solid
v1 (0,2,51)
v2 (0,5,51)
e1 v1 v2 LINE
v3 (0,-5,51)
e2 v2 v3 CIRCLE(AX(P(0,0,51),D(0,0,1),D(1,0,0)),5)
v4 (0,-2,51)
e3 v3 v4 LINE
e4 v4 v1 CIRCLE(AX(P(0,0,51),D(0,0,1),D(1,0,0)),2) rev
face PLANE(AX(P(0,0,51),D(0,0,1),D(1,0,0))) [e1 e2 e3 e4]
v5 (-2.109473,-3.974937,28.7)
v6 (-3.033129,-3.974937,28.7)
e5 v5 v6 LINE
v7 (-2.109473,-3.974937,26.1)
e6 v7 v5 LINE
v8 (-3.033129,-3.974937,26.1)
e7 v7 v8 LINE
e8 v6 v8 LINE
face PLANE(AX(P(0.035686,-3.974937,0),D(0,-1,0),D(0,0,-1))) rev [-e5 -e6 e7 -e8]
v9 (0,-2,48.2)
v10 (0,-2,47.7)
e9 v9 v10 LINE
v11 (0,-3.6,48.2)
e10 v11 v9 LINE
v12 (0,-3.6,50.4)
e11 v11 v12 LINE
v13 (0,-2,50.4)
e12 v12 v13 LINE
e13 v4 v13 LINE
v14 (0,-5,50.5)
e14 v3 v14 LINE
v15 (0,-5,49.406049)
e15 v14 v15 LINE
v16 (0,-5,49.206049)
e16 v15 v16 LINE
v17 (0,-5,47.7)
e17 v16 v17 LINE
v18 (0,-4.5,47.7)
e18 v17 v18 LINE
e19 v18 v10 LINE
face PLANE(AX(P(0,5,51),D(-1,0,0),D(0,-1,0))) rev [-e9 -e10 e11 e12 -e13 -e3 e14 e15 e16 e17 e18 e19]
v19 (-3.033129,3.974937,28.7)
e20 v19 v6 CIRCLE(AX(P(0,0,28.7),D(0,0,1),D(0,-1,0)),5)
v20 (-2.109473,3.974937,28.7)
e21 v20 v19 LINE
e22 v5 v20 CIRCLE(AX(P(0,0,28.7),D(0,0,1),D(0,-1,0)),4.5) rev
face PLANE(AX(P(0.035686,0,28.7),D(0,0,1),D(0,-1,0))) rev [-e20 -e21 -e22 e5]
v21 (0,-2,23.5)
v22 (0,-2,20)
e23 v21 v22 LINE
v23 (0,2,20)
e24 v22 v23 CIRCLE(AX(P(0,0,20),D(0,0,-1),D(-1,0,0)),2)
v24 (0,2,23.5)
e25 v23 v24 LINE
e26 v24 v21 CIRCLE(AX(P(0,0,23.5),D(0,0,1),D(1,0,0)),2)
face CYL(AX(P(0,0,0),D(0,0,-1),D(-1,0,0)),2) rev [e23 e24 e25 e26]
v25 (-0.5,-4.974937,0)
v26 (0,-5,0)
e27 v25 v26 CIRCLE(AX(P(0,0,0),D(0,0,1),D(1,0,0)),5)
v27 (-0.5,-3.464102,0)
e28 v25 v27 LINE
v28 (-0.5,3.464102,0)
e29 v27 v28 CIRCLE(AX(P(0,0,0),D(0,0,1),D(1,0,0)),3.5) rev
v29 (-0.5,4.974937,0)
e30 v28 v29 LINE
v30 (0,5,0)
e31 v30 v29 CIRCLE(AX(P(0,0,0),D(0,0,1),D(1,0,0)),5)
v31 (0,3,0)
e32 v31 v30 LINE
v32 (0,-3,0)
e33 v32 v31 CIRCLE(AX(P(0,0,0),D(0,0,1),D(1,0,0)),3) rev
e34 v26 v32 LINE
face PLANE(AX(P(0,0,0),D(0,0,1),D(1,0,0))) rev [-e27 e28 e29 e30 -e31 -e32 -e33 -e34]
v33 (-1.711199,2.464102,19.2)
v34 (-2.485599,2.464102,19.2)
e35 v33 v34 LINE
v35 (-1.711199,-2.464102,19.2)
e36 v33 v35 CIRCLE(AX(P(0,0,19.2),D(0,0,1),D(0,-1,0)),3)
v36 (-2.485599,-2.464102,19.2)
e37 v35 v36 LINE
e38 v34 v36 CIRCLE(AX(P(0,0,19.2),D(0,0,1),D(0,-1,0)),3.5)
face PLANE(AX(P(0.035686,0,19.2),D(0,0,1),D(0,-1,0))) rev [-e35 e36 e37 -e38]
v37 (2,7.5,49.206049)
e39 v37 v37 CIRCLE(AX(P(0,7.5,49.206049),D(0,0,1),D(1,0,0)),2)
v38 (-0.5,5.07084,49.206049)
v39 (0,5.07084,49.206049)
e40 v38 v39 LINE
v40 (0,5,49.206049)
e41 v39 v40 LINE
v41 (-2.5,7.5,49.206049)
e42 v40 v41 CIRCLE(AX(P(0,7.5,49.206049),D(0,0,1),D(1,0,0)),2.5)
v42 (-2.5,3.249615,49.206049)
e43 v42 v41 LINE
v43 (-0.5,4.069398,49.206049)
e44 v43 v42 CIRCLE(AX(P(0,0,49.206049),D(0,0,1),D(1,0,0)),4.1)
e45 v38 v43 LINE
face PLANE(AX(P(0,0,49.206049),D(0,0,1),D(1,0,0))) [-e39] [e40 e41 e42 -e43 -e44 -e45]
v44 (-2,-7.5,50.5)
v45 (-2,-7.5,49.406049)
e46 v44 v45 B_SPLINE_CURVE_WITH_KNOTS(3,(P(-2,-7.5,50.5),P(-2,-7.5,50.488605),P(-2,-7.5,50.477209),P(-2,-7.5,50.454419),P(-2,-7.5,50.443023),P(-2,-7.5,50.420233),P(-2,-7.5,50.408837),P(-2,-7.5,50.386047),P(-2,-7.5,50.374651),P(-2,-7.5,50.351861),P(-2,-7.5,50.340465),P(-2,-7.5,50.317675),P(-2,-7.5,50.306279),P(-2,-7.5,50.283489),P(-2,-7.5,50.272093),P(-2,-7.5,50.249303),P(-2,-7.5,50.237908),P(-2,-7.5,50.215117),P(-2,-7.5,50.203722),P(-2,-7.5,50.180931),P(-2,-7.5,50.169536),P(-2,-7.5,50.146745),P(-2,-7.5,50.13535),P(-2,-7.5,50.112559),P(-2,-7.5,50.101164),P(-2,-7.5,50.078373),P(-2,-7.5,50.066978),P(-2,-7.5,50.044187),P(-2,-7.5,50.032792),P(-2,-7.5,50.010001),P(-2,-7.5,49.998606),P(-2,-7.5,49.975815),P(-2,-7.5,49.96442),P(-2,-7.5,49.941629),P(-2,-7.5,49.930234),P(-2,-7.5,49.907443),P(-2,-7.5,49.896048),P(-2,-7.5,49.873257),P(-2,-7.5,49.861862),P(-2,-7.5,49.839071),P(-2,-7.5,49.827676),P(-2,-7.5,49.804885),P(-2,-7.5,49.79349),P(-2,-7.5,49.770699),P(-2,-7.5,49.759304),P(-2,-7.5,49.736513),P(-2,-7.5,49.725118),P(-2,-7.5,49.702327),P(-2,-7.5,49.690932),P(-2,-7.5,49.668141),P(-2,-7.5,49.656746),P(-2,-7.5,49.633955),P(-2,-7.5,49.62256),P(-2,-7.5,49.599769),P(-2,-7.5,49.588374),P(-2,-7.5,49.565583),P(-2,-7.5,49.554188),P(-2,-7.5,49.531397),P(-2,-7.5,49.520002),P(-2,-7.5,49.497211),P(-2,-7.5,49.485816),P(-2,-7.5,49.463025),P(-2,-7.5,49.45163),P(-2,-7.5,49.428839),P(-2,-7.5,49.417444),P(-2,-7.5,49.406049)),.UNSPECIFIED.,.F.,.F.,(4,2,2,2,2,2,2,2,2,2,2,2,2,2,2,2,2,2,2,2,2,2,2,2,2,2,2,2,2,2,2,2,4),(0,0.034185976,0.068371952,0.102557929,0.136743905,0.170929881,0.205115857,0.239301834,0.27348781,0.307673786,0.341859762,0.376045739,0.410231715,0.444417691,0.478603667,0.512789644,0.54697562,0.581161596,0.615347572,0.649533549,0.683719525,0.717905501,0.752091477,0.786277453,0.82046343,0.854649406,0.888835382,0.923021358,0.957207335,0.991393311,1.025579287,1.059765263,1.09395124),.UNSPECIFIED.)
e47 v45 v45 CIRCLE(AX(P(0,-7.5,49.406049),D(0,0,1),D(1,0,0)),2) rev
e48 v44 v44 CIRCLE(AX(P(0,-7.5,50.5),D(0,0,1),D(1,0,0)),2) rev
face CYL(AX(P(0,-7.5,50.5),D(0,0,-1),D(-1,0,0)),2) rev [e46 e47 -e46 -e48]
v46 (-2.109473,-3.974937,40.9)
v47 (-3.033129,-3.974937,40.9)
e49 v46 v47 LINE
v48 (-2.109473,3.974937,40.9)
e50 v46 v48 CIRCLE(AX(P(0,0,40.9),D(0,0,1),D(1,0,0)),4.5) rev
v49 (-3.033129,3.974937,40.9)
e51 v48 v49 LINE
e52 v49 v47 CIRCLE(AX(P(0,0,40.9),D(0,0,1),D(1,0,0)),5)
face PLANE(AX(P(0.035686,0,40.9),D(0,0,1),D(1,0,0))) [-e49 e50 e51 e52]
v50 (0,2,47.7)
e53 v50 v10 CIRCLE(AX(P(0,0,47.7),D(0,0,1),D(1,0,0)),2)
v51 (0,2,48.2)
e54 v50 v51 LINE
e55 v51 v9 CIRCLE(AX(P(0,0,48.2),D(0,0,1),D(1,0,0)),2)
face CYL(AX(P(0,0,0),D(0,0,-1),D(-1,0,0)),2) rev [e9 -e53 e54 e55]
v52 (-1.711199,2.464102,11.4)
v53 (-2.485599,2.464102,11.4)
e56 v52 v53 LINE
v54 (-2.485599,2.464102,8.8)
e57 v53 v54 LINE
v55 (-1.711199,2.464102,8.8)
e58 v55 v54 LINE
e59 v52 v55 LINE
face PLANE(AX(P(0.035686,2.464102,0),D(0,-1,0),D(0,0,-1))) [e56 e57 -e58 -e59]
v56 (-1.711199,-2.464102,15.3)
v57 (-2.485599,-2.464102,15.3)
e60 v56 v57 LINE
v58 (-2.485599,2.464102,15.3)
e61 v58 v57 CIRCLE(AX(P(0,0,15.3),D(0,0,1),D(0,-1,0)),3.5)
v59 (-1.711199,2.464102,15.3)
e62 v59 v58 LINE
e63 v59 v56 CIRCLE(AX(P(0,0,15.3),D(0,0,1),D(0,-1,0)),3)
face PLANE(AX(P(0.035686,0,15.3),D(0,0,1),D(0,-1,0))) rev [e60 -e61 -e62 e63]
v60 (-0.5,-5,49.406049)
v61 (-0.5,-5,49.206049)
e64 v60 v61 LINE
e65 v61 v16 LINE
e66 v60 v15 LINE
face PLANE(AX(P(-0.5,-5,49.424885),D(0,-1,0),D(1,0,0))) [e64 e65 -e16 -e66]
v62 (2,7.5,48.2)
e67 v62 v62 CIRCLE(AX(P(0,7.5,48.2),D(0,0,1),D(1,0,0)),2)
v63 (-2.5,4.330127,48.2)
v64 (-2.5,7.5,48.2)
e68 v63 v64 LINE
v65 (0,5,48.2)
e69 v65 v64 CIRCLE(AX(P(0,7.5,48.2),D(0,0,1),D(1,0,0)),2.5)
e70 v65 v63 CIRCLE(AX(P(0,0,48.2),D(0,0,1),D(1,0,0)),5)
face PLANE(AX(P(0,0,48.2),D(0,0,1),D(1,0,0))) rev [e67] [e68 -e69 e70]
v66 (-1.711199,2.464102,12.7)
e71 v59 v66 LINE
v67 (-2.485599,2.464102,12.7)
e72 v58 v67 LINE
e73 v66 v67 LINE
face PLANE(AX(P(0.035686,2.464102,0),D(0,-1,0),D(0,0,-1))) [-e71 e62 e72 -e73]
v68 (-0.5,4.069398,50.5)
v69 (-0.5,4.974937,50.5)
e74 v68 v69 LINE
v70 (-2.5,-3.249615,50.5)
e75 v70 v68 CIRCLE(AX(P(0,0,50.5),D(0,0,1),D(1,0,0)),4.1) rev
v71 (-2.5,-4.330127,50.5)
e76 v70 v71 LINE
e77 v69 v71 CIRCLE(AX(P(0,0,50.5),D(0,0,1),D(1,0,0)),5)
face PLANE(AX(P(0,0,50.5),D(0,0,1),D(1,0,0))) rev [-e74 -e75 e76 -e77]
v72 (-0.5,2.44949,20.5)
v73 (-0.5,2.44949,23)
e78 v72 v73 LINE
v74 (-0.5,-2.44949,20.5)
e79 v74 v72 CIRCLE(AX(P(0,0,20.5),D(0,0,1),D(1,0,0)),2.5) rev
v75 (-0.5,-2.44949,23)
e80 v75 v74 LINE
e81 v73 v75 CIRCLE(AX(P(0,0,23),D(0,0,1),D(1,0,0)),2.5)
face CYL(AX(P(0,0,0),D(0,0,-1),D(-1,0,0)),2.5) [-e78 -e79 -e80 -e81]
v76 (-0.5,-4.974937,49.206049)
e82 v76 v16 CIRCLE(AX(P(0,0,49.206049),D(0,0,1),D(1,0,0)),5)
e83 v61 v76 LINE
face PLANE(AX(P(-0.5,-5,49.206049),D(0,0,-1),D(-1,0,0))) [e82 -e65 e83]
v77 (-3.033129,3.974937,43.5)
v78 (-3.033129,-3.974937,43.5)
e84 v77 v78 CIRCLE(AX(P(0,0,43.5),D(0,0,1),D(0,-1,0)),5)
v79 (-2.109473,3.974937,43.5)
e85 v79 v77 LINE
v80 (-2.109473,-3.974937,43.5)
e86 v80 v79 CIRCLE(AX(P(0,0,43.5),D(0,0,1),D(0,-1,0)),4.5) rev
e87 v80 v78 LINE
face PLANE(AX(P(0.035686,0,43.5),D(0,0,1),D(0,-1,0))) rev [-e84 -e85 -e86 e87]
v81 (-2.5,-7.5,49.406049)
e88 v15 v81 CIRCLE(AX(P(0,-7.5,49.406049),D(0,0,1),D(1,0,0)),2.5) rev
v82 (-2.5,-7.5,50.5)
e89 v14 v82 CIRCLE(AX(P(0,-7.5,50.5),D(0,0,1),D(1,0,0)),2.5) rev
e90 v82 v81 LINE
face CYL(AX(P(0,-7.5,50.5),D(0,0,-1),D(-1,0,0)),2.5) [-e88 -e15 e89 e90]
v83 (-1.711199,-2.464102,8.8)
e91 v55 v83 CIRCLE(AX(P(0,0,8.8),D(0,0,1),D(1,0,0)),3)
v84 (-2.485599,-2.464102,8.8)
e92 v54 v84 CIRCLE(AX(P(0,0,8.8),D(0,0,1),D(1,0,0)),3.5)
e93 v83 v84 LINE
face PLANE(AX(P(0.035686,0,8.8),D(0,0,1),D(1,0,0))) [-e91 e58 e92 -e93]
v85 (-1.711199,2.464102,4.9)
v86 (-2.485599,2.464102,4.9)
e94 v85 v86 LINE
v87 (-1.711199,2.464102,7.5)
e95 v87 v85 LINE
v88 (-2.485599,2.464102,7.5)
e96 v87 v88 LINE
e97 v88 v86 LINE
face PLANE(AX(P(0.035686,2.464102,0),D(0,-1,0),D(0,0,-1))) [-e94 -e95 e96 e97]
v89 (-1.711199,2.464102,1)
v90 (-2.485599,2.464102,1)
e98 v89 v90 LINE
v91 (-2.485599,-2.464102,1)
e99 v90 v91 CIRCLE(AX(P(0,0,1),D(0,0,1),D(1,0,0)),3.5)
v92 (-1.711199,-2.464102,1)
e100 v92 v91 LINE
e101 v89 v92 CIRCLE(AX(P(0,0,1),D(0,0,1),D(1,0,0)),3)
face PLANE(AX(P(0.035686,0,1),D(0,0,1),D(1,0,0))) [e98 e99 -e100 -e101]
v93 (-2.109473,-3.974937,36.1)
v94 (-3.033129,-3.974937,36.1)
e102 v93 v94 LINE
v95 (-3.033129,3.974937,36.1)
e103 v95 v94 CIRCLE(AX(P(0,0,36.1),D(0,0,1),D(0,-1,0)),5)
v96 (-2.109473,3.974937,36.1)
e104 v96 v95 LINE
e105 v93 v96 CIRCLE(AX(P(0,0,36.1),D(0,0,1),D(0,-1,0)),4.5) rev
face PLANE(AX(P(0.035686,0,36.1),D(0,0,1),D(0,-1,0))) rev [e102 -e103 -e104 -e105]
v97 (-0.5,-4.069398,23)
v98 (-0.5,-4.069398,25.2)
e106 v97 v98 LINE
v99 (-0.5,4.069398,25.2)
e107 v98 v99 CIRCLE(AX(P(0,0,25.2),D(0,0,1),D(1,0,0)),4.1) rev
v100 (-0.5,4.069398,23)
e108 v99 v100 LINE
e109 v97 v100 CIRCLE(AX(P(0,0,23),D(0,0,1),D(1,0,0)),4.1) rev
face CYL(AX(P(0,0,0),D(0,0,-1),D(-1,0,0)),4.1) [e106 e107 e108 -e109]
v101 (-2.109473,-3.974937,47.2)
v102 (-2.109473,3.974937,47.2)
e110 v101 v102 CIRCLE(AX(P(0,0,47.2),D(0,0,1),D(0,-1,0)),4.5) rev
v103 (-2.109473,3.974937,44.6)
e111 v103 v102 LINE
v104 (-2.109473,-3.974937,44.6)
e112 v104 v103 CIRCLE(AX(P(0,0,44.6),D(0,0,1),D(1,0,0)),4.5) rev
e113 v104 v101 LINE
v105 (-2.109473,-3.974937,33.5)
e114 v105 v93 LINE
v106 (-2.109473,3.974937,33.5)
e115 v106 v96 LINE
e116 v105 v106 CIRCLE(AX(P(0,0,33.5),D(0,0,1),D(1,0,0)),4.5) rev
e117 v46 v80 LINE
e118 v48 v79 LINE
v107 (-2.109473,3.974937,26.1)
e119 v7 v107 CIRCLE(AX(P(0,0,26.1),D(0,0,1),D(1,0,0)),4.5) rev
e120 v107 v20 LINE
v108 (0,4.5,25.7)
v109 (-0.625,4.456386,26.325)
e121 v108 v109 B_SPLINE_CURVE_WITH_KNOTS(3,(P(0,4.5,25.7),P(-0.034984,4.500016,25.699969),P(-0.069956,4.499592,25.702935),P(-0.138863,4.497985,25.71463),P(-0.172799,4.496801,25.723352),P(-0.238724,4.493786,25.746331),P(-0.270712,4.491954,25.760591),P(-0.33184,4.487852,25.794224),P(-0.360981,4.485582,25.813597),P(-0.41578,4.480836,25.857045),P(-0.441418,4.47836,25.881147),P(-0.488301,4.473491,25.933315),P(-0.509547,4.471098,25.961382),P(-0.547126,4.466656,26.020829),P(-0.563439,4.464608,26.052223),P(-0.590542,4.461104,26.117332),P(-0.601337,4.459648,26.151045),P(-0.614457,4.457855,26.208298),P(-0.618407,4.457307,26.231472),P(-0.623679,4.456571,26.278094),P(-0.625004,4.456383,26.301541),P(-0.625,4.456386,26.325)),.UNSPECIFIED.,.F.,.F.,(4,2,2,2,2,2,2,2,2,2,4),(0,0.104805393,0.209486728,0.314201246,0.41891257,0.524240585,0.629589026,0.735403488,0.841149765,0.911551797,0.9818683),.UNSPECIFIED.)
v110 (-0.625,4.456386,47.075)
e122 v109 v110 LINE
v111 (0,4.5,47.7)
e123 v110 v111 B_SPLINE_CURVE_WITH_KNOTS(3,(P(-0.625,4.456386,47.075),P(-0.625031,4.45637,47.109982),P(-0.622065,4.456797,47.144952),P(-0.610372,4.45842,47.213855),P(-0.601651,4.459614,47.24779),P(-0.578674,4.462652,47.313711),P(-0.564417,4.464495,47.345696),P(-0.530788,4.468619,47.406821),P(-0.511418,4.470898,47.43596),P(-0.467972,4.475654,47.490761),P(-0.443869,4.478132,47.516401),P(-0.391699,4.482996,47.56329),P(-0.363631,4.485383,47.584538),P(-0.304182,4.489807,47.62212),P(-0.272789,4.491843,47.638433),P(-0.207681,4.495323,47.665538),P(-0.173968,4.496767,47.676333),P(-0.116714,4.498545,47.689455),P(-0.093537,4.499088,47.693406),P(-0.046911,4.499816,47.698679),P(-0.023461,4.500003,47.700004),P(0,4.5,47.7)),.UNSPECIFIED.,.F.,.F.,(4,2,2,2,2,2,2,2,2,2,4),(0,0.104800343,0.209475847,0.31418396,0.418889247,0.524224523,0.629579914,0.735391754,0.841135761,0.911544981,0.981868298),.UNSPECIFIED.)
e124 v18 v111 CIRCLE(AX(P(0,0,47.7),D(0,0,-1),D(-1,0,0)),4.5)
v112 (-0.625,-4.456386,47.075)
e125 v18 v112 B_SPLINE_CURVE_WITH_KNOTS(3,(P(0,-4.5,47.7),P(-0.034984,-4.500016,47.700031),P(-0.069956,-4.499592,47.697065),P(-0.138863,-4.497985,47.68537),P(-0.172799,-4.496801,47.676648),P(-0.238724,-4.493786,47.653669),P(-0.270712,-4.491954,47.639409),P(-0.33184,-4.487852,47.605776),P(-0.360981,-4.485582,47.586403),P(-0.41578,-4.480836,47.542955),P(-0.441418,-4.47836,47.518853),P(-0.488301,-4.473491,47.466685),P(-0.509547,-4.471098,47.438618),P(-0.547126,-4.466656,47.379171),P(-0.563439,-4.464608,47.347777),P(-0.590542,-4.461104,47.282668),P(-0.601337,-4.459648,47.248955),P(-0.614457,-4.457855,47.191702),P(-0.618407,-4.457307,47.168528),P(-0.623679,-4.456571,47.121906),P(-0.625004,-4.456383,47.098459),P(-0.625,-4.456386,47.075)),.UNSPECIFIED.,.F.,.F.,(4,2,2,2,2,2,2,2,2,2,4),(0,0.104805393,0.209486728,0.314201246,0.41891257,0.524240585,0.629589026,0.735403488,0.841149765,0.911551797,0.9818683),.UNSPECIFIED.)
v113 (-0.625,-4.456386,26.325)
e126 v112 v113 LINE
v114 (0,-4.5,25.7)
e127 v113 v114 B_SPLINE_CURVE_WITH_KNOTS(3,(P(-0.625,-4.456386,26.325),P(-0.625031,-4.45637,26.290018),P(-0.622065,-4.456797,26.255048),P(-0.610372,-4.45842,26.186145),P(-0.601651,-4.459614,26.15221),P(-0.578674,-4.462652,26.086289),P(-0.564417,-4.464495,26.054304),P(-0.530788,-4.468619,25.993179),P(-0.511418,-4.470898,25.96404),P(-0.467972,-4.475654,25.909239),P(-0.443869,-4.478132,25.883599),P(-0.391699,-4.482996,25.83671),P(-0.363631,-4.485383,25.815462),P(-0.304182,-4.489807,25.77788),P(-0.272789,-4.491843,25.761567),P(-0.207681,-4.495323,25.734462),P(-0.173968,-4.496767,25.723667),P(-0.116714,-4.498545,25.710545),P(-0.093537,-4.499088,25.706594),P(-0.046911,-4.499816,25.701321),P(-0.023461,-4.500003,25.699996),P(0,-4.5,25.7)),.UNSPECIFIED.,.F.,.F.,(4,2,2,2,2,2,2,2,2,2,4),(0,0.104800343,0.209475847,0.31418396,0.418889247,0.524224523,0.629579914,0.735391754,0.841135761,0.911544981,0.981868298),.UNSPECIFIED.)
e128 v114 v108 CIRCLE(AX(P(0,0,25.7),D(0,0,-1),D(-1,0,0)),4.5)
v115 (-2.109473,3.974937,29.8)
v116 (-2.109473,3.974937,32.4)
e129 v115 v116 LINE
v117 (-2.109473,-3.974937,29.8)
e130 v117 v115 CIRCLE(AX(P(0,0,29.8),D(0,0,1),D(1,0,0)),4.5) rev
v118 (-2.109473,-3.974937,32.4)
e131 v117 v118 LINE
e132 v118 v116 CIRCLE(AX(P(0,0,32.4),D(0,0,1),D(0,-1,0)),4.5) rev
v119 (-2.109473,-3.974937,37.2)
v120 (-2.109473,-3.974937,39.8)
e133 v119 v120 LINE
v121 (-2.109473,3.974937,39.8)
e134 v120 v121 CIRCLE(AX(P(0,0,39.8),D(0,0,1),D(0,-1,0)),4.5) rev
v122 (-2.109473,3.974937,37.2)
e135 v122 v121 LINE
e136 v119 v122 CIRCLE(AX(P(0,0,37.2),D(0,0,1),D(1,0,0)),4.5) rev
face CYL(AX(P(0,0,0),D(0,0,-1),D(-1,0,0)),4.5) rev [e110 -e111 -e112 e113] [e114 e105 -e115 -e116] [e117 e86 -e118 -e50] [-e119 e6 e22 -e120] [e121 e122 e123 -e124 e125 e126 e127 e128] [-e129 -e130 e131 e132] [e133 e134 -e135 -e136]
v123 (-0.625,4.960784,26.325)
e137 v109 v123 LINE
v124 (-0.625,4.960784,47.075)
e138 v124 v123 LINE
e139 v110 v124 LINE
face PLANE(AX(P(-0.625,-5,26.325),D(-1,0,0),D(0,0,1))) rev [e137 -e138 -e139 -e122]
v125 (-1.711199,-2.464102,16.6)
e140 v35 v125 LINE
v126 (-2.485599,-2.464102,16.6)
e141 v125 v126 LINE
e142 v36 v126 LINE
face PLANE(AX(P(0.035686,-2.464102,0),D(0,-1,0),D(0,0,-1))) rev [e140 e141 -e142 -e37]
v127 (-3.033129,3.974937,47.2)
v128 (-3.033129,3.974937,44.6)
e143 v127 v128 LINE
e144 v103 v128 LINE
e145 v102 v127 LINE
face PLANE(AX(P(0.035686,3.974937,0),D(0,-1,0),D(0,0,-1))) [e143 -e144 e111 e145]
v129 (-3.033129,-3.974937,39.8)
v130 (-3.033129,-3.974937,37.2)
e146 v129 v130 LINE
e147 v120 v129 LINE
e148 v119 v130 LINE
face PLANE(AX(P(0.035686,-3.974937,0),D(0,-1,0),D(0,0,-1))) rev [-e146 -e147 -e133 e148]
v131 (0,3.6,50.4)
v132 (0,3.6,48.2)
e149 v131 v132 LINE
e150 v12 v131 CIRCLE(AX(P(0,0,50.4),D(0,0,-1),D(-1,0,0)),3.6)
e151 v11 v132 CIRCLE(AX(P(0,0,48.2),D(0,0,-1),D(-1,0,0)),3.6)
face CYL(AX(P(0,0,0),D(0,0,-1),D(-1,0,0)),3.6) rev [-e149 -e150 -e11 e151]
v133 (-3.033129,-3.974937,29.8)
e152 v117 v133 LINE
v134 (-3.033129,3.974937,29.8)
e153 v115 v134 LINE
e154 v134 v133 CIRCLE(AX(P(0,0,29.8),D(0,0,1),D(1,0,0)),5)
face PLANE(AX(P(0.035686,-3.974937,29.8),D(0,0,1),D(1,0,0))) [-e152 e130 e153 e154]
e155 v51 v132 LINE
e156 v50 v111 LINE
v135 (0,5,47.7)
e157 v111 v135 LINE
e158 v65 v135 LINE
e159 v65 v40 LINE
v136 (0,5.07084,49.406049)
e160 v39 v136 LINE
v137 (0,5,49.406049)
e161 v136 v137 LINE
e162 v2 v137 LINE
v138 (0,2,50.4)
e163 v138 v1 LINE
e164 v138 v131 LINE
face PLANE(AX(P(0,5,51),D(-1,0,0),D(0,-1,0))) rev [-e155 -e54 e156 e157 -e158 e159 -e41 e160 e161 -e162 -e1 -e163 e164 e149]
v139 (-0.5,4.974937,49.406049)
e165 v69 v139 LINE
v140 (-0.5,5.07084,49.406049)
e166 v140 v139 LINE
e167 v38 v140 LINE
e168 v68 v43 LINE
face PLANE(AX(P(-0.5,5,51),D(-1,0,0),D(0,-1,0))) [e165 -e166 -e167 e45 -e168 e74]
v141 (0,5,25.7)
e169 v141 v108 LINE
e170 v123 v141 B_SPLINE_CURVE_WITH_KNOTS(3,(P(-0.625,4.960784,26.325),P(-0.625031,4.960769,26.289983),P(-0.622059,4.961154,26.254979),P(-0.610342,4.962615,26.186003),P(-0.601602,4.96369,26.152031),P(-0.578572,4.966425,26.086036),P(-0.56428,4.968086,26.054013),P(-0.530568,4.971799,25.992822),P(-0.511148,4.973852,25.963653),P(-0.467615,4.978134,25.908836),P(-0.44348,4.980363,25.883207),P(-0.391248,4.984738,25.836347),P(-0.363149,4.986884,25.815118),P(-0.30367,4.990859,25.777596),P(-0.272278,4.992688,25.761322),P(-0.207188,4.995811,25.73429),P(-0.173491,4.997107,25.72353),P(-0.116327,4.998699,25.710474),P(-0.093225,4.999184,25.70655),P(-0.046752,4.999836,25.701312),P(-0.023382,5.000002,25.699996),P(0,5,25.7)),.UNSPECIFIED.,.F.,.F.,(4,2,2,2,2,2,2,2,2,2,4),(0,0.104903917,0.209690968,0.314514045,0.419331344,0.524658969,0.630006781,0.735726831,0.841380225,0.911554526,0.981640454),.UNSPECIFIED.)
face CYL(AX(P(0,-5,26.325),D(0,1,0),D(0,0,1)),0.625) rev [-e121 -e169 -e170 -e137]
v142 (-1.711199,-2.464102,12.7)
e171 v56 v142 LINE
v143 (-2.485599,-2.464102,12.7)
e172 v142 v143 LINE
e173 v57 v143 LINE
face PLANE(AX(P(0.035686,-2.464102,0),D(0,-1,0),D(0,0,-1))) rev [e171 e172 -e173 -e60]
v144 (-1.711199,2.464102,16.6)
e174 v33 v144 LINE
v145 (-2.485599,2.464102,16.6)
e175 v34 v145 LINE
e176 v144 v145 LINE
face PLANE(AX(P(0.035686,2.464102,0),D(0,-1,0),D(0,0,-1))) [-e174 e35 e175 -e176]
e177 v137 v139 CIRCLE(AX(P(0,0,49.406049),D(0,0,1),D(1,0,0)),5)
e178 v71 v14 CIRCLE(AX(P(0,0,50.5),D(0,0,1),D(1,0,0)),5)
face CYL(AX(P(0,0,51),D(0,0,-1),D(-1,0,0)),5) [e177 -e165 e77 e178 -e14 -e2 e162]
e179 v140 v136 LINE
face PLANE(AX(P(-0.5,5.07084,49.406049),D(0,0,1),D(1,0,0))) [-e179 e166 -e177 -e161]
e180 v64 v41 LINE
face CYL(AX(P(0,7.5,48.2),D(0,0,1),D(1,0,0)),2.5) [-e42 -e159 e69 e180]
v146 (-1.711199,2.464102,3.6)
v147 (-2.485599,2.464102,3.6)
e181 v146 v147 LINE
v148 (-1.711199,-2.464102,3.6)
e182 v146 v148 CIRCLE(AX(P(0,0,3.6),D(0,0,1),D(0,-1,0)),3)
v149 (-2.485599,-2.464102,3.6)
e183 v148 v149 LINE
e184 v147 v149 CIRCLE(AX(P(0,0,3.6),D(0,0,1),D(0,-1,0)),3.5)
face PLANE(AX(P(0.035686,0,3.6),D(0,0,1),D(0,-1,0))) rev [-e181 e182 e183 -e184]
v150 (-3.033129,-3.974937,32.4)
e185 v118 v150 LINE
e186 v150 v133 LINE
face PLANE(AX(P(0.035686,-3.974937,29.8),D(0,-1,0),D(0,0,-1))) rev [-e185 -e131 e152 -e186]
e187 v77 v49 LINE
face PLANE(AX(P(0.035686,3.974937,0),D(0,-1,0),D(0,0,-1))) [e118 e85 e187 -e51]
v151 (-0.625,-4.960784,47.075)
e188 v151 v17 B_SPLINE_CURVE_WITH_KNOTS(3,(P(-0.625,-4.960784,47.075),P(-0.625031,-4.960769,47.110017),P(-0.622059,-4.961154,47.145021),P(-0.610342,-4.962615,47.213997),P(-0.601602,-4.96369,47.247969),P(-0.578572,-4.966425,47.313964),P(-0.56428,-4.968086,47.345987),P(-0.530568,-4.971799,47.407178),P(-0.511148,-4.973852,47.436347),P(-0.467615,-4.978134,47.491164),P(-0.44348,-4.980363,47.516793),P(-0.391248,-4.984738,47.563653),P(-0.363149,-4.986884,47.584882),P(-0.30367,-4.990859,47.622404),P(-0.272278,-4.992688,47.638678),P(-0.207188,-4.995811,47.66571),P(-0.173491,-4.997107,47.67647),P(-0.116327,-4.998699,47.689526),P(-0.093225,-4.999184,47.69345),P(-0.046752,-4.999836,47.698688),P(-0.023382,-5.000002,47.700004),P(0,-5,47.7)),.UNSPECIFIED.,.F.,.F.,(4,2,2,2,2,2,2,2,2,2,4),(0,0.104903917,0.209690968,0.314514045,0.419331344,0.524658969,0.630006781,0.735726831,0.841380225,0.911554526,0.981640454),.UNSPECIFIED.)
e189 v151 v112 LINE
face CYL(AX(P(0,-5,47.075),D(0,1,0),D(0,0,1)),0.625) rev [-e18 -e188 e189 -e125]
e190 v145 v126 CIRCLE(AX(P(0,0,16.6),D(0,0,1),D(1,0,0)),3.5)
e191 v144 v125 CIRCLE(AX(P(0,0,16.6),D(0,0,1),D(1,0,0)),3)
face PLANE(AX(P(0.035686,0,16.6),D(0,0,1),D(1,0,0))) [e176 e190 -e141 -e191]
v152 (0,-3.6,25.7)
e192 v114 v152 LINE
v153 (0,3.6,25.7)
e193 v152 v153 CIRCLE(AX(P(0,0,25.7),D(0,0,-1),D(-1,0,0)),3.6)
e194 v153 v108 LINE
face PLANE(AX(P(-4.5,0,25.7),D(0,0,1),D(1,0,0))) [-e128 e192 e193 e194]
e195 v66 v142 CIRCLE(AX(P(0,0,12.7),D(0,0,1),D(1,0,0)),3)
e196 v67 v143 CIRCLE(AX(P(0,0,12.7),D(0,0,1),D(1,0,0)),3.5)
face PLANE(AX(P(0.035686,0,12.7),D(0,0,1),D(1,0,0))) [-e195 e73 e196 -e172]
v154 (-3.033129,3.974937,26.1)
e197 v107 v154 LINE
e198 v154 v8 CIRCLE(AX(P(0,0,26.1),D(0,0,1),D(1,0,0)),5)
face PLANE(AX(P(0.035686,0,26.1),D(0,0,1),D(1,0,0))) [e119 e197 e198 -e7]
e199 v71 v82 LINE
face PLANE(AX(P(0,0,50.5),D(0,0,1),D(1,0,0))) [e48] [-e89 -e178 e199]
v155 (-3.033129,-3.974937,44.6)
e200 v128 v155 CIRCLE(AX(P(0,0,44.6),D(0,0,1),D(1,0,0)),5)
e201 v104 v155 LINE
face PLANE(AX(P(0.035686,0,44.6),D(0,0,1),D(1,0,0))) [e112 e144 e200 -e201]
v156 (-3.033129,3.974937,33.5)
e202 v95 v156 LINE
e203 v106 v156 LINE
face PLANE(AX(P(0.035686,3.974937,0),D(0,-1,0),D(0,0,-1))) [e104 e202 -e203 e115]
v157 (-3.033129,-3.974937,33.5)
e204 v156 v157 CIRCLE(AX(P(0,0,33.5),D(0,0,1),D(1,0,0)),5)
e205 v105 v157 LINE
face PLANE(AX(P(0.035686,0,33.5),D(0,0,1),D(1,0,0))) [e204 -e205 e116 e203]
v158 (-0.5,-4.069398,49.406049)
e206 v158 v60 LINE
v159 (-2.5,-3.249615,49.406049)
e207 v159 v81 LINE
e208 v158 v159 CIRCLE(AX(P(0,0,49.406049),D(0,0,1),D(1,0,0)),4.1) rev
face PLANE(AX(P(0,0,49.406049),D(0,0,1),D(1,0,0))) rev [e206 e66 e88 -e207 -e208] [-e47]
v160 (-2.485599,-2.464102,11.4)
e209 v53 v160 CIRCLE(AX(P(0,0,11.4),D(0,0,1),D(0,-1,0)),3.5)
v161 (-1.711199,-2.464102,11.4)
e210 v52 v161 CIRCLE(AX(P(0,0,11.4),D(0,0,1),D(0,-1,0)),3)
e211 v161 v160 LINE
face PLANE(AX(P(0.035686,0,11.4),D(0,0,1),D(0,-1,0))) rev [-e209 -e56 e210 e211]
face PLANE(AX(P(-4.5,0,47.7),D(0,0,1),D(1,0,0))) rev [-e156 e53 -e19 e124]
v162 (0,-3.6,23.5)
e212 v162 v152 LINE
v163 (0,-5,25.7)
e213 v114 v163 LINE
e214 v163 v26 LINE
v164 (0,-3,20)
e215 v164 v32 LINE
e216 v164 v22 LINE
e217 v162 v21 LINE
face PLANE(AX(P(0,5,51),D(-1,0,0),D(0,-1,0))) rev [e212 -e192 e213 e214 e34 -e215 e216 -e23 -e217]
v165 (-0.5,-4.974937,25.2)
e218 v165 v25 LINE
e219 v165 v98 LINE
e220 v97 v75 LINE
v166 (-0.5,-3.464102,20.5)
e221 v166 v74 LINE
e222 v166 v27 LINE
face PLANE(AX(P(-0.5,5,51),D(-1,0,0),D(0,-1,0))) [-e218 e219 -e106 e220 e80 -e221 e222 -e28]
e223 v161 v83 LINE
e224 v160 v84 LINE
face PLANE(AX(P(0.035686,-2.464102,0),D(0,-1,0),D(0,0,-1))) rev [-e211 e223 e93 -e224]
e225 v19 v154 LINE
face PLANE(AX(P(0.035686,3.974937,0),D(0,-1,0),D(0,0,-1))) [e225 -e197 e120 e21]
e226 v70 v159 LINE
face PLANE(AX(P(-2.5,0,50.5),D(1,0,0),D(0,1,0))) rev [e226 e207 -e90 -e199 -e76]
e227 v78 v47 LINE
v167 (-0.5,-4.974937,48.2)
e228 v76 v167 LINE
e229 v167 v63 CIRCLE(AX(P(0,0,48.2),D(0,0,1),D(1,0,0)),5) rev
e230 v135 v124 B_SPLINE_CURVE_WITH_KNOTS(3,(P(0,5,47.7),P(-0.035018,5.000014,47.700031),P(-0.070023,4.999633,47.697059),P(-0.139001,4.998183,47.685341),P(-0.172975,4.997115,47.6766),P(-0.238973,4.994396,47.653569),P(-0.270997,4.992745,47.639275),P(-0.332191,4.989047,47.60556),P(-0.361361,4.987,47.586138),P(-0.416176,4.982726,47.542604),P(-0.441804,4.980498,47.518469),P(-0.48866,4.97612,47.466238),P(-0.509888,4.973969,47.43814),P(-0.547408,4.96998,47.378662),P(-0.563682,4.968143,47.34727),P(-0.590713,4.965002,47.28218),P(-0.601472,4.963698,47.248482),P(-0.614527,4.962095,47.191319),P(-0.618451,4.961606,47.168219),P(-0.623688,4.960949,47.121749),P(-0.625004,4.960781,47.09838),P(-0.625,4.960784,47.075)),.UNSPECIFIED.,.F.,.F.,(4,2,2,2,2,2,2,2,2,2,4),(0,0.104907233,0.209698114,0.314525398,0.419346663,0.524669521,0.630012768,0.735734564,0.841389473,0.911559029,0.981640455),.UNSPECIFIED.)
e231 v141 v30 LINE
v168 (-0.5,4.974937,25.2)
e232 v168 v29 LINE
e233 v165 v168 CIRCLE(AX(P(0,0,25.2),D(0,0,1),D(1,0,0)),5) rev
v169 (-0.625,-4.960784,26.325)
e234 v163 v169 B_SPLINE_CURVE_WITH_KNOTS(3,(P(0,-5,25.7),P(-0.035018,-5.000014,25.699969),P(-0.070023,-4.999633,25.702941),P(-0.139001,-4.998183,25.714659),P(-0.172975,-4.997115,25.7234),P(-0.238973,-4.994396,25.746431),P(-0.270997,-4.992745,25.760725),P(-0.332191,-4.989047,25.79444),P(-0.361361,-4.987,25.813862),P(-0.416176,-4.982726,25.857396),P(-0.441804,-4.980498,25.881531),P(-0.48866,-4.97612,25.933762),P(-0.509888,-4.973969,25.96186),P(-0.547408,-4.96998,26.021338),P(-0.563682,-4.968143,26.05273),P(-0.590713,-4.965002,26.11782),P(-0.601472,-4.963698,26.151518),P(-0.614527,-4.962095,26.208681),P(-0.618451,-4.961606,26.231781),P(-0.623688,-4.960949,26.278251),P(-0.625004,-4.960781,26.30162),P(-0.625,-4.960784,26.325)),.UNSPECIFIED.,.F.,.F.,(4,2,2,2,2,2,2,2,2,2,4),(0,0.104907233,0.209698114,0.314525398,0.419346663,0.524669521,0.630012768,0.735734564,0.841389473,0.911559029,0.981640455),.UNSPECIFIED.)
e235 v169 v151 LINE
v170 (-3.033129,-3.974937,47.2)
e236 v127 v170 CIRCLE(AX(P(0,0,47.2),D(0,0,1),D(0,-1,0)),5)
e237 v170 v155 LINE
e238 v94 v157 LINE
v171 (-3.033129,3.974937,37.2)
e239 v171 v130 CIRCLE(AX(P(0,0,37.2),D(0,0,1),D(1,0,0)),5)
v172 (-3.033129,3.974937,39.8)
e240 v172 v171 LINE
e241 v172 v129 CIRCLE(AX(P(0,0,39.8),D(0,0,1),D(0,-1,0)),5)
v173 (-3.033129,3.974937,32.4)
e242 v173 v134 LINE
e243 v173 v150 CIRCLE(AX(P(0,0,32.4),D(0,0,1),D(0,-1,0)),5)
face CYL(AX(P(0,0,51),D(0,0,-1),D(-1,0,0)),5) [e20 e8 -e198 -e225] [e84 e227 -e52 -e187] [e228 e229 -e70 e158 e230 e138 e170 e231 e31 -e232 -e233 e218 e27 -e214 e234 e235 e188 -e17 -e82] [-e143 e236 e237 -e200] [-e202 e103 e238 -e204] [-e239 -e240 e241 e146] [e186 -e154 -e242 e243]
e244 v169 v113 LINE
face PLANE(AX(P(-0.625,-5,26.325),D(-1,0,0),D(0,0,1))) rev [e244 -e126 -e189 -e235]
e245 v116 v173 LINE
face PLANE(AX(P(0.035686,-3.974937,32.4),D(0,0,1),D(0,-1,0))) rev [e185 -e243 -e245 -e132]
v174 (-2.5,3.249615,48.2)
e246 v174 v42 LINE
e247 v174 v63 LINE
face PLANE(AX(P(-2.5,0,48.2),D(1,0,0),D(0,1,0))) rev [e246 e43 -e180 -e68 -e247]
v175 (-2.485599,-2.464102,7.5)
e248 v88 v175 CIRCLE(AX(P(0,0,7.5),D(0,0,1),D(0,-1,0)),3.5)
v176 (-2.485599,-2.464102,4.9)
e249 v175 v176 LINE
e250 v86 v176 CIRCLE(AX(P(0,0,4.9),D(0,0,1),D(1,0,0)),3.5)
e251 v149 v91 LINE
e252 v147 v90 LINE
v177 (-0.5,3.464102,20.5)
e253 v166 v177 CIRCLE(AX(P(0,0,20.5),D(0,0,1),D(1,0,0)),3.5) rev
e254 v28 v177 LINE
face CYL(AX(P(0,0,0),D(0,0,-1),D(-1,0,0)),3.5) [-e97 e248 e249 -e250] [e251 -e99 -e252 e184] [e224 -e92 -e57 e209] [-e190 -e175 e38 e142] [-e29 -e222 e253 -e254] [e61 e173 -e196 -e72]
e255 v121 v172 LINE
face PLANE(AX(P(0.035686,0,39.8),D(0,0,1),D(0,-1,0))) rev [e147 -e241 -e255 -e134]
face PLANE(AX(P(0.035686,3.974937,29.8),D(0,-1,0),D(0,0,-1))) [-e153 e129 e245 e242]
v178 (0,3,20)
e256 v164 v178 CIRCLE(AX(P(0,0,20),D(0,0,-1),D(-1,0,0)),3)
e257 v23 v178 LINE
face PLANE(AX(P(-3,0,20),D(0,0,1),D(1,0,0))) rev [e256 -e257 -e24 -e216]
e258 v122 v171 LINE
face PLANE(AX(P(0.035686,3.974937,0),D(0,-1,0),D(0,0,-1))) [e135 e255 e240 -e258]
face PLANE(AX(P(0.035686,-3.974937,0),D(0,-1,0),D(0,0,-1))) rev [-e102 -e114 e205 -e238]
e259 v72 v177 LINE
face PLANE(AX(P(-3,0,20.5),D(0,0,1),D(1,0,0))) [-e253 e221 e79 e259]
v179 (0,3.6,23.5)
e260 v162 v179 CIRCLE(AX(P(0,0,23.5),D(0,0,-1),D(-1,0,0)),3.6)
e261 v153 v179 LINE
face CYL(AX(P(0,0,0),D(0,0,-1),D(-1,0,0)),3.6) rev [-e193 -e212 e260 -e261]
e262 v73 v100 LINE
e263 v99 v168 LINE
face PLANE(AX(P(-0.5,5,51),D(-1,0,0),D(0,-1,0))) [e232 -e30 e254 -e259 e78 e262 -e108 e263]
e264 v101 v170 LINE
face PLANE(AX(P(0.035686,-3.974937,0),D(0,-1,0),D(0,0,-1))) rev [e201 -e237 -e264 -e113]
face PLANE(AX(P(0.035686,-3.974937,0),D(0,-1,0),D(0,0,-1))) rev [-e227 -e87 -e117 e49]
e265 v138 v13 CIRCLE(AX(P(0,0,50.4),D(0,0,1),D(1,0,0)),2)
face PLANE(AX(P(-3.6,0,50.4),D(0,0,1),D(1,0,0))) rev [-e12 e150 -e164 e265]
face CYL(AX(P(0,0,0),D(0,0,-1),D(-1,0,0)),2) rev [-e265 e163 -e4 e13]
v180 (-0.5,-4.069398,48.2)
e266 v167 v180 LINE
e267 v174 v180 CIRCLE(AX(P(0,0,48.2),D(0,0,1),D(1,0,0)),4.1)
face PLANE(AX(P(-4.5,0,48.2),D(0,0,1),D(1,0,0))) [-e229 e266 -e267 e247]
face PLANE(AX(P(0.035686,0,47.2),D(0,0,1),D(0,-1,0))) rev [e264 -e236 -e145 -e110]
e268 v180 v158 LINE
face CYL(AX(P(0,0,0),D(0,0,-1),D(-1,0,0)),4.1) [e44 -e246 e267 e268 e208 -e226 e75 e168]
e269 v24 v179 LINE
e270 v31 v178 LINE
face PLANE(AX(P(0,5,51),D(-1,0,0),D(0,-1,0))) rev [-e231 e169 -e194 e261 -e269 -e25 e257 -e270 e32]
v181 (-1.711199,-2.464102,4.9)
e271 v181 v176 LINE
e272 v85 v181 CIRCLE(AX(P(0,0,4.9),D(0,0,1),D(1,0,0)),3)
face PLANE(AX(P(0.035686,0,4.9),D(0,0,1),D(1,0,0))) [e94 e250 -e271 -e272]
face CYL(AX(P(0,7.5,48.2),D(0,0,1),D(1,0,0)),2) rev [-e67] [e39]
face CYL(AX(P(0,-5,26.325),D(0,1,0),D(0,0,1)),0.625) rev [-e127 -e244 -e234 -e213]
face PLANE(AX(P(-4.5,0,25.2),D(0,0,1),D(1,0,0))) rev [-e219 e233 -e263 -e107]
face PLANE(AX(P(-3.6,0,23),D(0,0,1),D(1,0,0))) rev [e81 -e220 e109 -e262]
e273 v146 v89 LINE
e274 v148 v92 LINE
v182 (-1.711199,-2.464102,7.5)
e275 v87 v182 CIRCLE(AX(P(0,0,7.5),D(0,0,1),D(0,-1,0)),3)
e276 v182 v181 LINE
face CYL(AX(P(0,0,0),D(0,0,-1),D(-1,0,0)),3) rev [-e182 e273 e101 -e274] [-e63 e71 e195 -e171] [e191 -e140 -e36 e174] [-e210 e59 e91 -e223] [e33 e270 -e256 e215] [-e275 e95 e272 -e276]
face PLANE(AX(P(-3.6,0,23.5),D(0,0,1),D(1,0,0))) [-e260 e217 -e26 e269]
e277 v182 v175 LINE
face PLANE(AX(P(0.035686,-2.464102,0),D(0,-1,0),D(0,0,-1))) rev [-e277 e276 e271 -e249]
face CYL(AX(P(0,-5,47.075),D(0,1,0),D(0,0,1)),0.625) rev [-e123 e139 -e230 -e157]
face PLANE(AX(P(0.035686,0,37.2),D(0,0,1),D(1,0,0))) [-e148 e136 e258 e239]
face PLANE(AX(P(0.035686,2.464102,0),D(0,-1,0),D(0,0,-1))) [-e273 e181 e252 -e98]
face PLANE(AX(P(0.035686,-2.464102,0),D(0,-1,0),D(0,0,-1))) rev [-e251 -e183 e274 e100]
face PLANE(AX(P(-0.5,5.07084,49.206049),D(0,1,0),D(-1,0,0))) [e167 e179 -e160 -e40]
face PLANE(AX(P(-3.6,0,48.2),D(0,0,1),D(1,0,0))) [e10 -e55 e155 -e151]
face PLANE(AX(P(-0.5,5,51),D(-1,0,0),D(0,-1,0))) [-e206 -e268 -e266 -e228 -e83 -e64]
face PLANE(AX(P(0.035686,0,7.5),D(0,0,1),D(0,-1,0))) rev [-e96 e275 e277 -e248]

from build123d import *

# Parameters (mm, degrees)
BOSS_EXTRUDE2_DEPTH     = 51
SKETCH4_W               = 2
SKETCH4_H               = 3.5
SKETCH4_W_2             = 1.6
SKETCH4_H_2             = 2.2
SKETCH4_H_3             = 22
SKETCH4_H_4             = 0.5
SKETCH4_H_5             = 0.6
CUT_EXTRUDE1_DEPTH      = 52.487862647
CUT_EXTRUDE1_DEPTH_BACK = 52.487862647
SHELL1_DEPTH            = 23
SHELL1_START            = 48.2
SHELL1_2_DEPTH          = 2.3
SHELL1_START_2          = 23
SHELL1_3_DEPTH          = 2.2
SHELL1_START_3          = 20.5
SHELL1_4_DEPTH          = 2.5
CUT_EXTRUDE2_DEPTH      = 52.487862766
CUT_EXTRUDE2_DEPTH_BACK = 52.487862766
SKETCH11_3_W            = 2.6
SKETCH11_3_H            = 7.949874372
SKETCH11_3_H_2          = 4.92820323
BOSS_EXTRUDE3_START     = -1.206049
SKETCH13_R              = 2.5
SKETCH13_R_2            = 2
BOSS_EXTRUDE3_DEPTH     = 1.206049
SKETCH13_3_R            = 2.5
SKETCH13_3_R_2          = 2
BOSS_EXTRUDE4_DEPTH     = 1.093951
CUT_EXTRUDE3_START      = -0.2
SKETCH13_6_R            = 2.5
SKETCH13_6_R_2          = 2
CUT_EXTRUDE3_DEPTH      = 0.2
CUT_EXTRUDE4_START      = -0.2
SKETCH13_7_R            = 2.5
SKETCH13_7_R_2          = 2
CUT_EXTRUDE4_DEPTH      = 0.2
SKETCH16_W              = 0.218836676
SKETCH16_H              = 0.970663166
SKETCH16_W_2            = 0.2
SKETCH16_H_2            = 1.122183611
BOSS_EXTRUDE10_DEPTH    = 0.5


# Read off the part's stored shape, not the designer's step: Shell1
with BuildPart() as part:
    # Sketch1 → Boss-Extrude2 (new body)
    with BuildSketch(Plane.XY):
        with BuildLine():
            Line((0, 5), (0, -5))
            ThreePointArc((0, -5), (-5, 0), (0, 5))
        make_face()
    extrude(amount=BOSS_EXTRUDE2_DEPTH)

    # Sketch4 → Cut-Revolve1 (revolve, cut)
    with BuildSketch(Plane(origin=(0, 0, 0), x_dir=(1, 0, 0), z_dir=(0, 1, 0))):
        Polygon((-3, 0), (-3, -20), (-2, -20), (0, -20), (0, 0), align=None)
        with Locations((-1, -21.75)):
            Rectangle(SKETCH4_W, SKETCH4_H)
        with Locations((-2.8, -24.6)):
            Rectangle(SKETCH4_W_2, SKETCH4_H_2)
        with Locations((-1, -24.6)):
            Rectangle(SKETCH4_W, SKETCH4_H_2)
        Polygon((-2, -47.7), (-2, -25.7), (-3.6, -25.7), (-4.5, -25.7), (-4.5, -47.7), align=None)
        with Locations((-1, -36.7)):
            Rectangle(SKETCH4_W, SKETCH4_H_3)
        with Locations((-1, -47.95)):
            Rectangle(SKETCH4_W, SKETCH4_H_4)
        with Locations((-2.8, -49.3)):
            Rectangle(SKETCH4_W_2, SKETCH4_H_2)
        with Locations((-1, -49.3)):
            Rectangle(SKETCH4_W, SKETCH4_H_2)
        with Locations((-1, -50.7)):
            Rectangle(SKETCH4_W, SKETCH4_H_5)
    revolve(axis=Axis((0, 0, 0), (0, 0, 1)), mode=Mode.SUBTRACT)

    # Sketch5 → Cut-Extrude1 (cut, two sides: drawn at the far end of the back side and taken through both)
    with BuildSketch(Plane(origin=(0, 0, 0), x_dir=(1, 0, 0), z_dir=(0, 1, 0)).offset(-CUT_EXTRUDE1_DEPTH_BACK)):
        with BuildLine():
            Line((0.625, -26.325), (0.625, -47.075))
            ThreePointArc((0.625, -47.075), (0, -47.7), (-0.625, -47.075))
            Line((-0.625, -47.075), (-0.625, -26.325))
            ThreePointArc((-0.625, -26.325), (0, -25.7), (0.625, -26.325))
        make_face()
    extrude(amount=CUT_EXTRUDE1_DEPTH + CUT_EXTRUDE1_DEPTH_BACK, mode=Mode.SUBTRACT)

    # Shell1 outline → Shell1 (cut)
    with BuildSketch(Plane.XY):
        with BuildLine():
            ThreePointArc((-0.5, -3.464101615), (-3.5, 0), (-0.5, 3.464101615))
            Line((-0.5, 3.464101615), (-0.5, 4.974937186))
            ThreePointArc((-0.5, 4.974937186), (-5, 0), (-0.5, -4.974937186))
            Line((-0.5, -4.974937186), (-0.5, -3.464101615))
        make_face()
    extrude(amount=SHELL1_DEPTH, mode=Mode.SUBTRACT)

    # Shell1 2 outline → Shell1 2 (cut)
    with BuildSketch(Plane.XY.offset(SHELL1_START)):
        with BuildLine():
            Line((-0.5, -4.974937186), (-0.5, -4.06939799))
            ThreePointArc((-0.5, -4.06939799), (-4.1, 0), (-0.5, 4.06939799))
            Line((-0.5, 4.06939799), (-0.5, 4.974937186))
            ThreePointArc((-0.5, 4.974937186), (-5, 0), (-0.5, -4.974937186))
        make_face()
    extrude(amount=SHELL1_2_DEPTH, mode=Mode.SUBTRACT)

    # Shell1 3 outline → Shell1 3 (cut)
    with BuildSketch(Plane.XY.offset(SHELL1_START_2)):
        with BuildLine():
            Line((-0.5, -4.974937186), (-0.5, -4.06939799))
            ThreePointArc((-0.5, -4.06939799), (-4.1, 0), (-0.5, 4.06939799))
            Line((-0.5, 4.06939799), (-0.5, 4.974937186))
            ThreePointArc((-0.5, 4.974937186), (-5, 0), (-0.5, -4.974937186))
        make_face()
    extrude(amount=SHELL1_3_DEPTH, mode=Mode.SUBTRACT)

    # Shell1 4 outline → Shell1 4 (cut)
    with BuildSketch(Plane.XY.offset(SHELL1_START_3)):
        with BuildLine():
            Line((-0.5, -3.464101615), (-0.5, -2.449489743))
            ThreePointArc((-0.5, -2.449489743), (-2.5, 0), (-0.5, 2.449489743))
            Line((-0.5, 2.449489743), (-0.5, 3.464101615))
            ThreePointArc((-0.5, 3.464101615), (-3.5, 0), (-0.5, -3.464101615))
        make_face()
    extrude(amount=SHELL1_4_DEPTH, mode=Mode.SUBTRACT)

    # Sketch11<3> → Cut-Extrude2 (cut, two sides: drawn at the far end of the back side and taken through both)
    with BuildSketch(Plane.ZY.offset(5).offset(-CUT_EXTRUDE2_DEPTH_BACK)):
        with Locations((27.4, 0)):
            Rectangle(SKETCH11_3_W, SKETCH11_3_H)
        with Locations((34.8, 0)):
            Rectangle(SKETCH11_3_W, SKETCH11_3_H)
        with Locations((38.5, 0)):
            Rectangle(SKETCH11_3_W, SKETCH11_3_H)
        with Locations((42.2, 0)):
            Rectangle(SKETCH11_3_W, SKETCH11_3_H)
        with Locations((45.9, 0)):
            Rectangle(SKETCH11_3_W, SKETCH11_3_H)
        with Locations((2.3, 0)):
            Rectangle(SKETCH11_3_W, SKETCH11_3_H_2)
        with Locations((6.2, 0)):
            Rectangle(SKETCH11_3_W, SKETCH11_3_H_2)
        with Locations((10.1, 0)):
            Rectangle(SKETCH11_3_W, SKETCH11_3_H_2)
        with Locations((14, 0)):
            Rectangle(SKETCH11_3_W, SKETCH11_3_H_2)
        with Locations((17.9, 0)):
            Rectangle(SKETCH11_3_W, SKETCH11_3_H_2)
        with Locations((31.1, 0)):
            Rectangle(SKETCH11_3_W, SKETCH11_3_H)
    extrude(amount=CUT_EXTRUDE2_DEPTH + CUT_EXTRUDE2_DEPTH_BACK, mode=Mode.SUBTRACT)

    # Sketch13 → Boss-Extrude3 (add)
    # profile 1 of 2: a face of its own
    with BuildSketch(Plane.XY.offset(49.40604876).offset(BOSS_EXTRUDE3_START)):
        with Locations((0, 7.5)):
            Circle(SKETCH13_R)
        with Locations((0, 7.5)):
            Circle(SKETCH13_R_2, mode=Mode.SUBTRACT)
    # profile 2 of 2: a face of its own
    with BuildSketch(Plane.XY.offset(49.40604876).offset(BOSS_EXTRUDE3_START)):
        with BuildLine():
            Line((0, 4.1), (0, 5))
            ThreePointArc((0, 5), (-1.767766953, 5.732233047), (-2.5, 7.5))
            Line((-2.5, 7.5), (-2.5, 3.249615362))
            ThreePointArc((-2.5, 3.249615362), (-1.320336513, 3.881586208), (0, 4.1))
        make_face()
    extrude(amount=BOSS_EXTRUDE3_DEPTH)

    # Sketch13<3> → Boss-Extrude4 (add)
    # profile 1 of 2: a face of its own
    with BuildSketch(Plane.XY.offset(49.40604876)):
        with Locations((0, -7.5)):
            Circle(SKETCH13_3_R)
        with Locations(Location((0, -7.5, 0), (0, 0, 180))):
            Circle(SKETCH13_3_R_2, mode=Mode.SUBTRACT)
    # profile 2 of 2: a face of its own
    with BuildSketch(Plane.XY.offset(49.40604876)):
        with BuildLine():
            ThreePointArc((-2.5, -7.5), (-1.767766953, -5.732233047), (0, -5))
            Line((0, -5), (0, -4.1))
            ThreePointArc((0, -4.1), (-1.320336513, -3.881586208), (-2.5, -3.249615362))
            Line((-2.5, -3.249615362), (-2.5, -7.5))
        make_face()
    extrude(amount=BOSS_EXTRUDE4_DEPTH)

    # Sketch13<6> → Cut-Extrude3 (cut)
    # profile 1 of 2: a face of its own
    with BuildSketch(Plane.XY.offset(49.40604876).offset(CUT_EXTRUDE3_START)):
        with BuildLine():
            Line((0, 4.1), (0, 5))
            ThreePointArc((0, 5), (-1.767766953, 5.732233047), (-2.5, 7.5))
            Line((-2.5, 7.5), (-2.5, 3.249615362))
            ThreePointArc((-2.5, 3.249615362), (-1.320336513, 3.881586208), (0, 4.1))
        make_face()
    # profile 2 of 2: a face of its own
    with BuildSketch(Plane.XY.offset(49.40604876).offset(CUT_EXTRUDE3_START)):
        with Locations((0, 7.5)):
            Circle(SKETCH13_6_R)
        with Locations((0, 7.5)):
            Circle(SKETCH13_6_R_2, mode=Mode.SUBTRACT)
    extrude(amount=CUT_EXTRUDE3_DEPTH, mode=Mode.SUBTRACT)

    # Sketch13<7> → Cut-Extrude4 (cut)
    # profile 1 of 2: a face of its own
    with BuildSketch(Plane.XY.offset(49.40604876).offset(CUT_EXTRUDE4_START)):
        with Locations((0, -7.5)):
            Circle(SKETCH13_7_R)
        with Locations(Location((0, -7.5, 0), (0, 0, 180))):
            Circle(SKETCH13_7_R_2, mode=Mode.SUBTRACT)
    # profile 2 of 2: a face of its own
    with BuildSketch(Plane.XY.offset(49.40604876).offset(CUT_EXTRUDE4_START)):
        with BuildLine():
            ThreePointArc((-2.5, -7.5), (-1.767766953, -5.732233047), (0, -5))
            Line((0, -5), (0, -4.1))
            ThreePointArc((0, -4.1), (-1.320336513, -3.881586208), (-2.5, -3.249615362))
            Line((-2.5, -3.249615362), (-2.5, -7.5))
        make_face()
    extrude(amount=CUT_EXTRUDE4_DEPTH, mode=Mode.SUBTRACT)

    # Sketch16 → Boss-Extrude10 (add)
    with BuildSketch(Plane(origin=(0, 0, 0), x_dir=(0, 0, -1), z_dir=(1, 0, 0))):
        with Locations((-49.315467098, -4.514668417)):
            Rectangle(SKETCH16_W, SKETCH16_H)
        with Locations((-49.30604876, 4.509747926)):
            Rectangle(SKETCH16_W_2, SKETCH16_H_2)
    extrude(amount=-BOSS_EXTRUDE10_DEPTH)


solid = part.part
